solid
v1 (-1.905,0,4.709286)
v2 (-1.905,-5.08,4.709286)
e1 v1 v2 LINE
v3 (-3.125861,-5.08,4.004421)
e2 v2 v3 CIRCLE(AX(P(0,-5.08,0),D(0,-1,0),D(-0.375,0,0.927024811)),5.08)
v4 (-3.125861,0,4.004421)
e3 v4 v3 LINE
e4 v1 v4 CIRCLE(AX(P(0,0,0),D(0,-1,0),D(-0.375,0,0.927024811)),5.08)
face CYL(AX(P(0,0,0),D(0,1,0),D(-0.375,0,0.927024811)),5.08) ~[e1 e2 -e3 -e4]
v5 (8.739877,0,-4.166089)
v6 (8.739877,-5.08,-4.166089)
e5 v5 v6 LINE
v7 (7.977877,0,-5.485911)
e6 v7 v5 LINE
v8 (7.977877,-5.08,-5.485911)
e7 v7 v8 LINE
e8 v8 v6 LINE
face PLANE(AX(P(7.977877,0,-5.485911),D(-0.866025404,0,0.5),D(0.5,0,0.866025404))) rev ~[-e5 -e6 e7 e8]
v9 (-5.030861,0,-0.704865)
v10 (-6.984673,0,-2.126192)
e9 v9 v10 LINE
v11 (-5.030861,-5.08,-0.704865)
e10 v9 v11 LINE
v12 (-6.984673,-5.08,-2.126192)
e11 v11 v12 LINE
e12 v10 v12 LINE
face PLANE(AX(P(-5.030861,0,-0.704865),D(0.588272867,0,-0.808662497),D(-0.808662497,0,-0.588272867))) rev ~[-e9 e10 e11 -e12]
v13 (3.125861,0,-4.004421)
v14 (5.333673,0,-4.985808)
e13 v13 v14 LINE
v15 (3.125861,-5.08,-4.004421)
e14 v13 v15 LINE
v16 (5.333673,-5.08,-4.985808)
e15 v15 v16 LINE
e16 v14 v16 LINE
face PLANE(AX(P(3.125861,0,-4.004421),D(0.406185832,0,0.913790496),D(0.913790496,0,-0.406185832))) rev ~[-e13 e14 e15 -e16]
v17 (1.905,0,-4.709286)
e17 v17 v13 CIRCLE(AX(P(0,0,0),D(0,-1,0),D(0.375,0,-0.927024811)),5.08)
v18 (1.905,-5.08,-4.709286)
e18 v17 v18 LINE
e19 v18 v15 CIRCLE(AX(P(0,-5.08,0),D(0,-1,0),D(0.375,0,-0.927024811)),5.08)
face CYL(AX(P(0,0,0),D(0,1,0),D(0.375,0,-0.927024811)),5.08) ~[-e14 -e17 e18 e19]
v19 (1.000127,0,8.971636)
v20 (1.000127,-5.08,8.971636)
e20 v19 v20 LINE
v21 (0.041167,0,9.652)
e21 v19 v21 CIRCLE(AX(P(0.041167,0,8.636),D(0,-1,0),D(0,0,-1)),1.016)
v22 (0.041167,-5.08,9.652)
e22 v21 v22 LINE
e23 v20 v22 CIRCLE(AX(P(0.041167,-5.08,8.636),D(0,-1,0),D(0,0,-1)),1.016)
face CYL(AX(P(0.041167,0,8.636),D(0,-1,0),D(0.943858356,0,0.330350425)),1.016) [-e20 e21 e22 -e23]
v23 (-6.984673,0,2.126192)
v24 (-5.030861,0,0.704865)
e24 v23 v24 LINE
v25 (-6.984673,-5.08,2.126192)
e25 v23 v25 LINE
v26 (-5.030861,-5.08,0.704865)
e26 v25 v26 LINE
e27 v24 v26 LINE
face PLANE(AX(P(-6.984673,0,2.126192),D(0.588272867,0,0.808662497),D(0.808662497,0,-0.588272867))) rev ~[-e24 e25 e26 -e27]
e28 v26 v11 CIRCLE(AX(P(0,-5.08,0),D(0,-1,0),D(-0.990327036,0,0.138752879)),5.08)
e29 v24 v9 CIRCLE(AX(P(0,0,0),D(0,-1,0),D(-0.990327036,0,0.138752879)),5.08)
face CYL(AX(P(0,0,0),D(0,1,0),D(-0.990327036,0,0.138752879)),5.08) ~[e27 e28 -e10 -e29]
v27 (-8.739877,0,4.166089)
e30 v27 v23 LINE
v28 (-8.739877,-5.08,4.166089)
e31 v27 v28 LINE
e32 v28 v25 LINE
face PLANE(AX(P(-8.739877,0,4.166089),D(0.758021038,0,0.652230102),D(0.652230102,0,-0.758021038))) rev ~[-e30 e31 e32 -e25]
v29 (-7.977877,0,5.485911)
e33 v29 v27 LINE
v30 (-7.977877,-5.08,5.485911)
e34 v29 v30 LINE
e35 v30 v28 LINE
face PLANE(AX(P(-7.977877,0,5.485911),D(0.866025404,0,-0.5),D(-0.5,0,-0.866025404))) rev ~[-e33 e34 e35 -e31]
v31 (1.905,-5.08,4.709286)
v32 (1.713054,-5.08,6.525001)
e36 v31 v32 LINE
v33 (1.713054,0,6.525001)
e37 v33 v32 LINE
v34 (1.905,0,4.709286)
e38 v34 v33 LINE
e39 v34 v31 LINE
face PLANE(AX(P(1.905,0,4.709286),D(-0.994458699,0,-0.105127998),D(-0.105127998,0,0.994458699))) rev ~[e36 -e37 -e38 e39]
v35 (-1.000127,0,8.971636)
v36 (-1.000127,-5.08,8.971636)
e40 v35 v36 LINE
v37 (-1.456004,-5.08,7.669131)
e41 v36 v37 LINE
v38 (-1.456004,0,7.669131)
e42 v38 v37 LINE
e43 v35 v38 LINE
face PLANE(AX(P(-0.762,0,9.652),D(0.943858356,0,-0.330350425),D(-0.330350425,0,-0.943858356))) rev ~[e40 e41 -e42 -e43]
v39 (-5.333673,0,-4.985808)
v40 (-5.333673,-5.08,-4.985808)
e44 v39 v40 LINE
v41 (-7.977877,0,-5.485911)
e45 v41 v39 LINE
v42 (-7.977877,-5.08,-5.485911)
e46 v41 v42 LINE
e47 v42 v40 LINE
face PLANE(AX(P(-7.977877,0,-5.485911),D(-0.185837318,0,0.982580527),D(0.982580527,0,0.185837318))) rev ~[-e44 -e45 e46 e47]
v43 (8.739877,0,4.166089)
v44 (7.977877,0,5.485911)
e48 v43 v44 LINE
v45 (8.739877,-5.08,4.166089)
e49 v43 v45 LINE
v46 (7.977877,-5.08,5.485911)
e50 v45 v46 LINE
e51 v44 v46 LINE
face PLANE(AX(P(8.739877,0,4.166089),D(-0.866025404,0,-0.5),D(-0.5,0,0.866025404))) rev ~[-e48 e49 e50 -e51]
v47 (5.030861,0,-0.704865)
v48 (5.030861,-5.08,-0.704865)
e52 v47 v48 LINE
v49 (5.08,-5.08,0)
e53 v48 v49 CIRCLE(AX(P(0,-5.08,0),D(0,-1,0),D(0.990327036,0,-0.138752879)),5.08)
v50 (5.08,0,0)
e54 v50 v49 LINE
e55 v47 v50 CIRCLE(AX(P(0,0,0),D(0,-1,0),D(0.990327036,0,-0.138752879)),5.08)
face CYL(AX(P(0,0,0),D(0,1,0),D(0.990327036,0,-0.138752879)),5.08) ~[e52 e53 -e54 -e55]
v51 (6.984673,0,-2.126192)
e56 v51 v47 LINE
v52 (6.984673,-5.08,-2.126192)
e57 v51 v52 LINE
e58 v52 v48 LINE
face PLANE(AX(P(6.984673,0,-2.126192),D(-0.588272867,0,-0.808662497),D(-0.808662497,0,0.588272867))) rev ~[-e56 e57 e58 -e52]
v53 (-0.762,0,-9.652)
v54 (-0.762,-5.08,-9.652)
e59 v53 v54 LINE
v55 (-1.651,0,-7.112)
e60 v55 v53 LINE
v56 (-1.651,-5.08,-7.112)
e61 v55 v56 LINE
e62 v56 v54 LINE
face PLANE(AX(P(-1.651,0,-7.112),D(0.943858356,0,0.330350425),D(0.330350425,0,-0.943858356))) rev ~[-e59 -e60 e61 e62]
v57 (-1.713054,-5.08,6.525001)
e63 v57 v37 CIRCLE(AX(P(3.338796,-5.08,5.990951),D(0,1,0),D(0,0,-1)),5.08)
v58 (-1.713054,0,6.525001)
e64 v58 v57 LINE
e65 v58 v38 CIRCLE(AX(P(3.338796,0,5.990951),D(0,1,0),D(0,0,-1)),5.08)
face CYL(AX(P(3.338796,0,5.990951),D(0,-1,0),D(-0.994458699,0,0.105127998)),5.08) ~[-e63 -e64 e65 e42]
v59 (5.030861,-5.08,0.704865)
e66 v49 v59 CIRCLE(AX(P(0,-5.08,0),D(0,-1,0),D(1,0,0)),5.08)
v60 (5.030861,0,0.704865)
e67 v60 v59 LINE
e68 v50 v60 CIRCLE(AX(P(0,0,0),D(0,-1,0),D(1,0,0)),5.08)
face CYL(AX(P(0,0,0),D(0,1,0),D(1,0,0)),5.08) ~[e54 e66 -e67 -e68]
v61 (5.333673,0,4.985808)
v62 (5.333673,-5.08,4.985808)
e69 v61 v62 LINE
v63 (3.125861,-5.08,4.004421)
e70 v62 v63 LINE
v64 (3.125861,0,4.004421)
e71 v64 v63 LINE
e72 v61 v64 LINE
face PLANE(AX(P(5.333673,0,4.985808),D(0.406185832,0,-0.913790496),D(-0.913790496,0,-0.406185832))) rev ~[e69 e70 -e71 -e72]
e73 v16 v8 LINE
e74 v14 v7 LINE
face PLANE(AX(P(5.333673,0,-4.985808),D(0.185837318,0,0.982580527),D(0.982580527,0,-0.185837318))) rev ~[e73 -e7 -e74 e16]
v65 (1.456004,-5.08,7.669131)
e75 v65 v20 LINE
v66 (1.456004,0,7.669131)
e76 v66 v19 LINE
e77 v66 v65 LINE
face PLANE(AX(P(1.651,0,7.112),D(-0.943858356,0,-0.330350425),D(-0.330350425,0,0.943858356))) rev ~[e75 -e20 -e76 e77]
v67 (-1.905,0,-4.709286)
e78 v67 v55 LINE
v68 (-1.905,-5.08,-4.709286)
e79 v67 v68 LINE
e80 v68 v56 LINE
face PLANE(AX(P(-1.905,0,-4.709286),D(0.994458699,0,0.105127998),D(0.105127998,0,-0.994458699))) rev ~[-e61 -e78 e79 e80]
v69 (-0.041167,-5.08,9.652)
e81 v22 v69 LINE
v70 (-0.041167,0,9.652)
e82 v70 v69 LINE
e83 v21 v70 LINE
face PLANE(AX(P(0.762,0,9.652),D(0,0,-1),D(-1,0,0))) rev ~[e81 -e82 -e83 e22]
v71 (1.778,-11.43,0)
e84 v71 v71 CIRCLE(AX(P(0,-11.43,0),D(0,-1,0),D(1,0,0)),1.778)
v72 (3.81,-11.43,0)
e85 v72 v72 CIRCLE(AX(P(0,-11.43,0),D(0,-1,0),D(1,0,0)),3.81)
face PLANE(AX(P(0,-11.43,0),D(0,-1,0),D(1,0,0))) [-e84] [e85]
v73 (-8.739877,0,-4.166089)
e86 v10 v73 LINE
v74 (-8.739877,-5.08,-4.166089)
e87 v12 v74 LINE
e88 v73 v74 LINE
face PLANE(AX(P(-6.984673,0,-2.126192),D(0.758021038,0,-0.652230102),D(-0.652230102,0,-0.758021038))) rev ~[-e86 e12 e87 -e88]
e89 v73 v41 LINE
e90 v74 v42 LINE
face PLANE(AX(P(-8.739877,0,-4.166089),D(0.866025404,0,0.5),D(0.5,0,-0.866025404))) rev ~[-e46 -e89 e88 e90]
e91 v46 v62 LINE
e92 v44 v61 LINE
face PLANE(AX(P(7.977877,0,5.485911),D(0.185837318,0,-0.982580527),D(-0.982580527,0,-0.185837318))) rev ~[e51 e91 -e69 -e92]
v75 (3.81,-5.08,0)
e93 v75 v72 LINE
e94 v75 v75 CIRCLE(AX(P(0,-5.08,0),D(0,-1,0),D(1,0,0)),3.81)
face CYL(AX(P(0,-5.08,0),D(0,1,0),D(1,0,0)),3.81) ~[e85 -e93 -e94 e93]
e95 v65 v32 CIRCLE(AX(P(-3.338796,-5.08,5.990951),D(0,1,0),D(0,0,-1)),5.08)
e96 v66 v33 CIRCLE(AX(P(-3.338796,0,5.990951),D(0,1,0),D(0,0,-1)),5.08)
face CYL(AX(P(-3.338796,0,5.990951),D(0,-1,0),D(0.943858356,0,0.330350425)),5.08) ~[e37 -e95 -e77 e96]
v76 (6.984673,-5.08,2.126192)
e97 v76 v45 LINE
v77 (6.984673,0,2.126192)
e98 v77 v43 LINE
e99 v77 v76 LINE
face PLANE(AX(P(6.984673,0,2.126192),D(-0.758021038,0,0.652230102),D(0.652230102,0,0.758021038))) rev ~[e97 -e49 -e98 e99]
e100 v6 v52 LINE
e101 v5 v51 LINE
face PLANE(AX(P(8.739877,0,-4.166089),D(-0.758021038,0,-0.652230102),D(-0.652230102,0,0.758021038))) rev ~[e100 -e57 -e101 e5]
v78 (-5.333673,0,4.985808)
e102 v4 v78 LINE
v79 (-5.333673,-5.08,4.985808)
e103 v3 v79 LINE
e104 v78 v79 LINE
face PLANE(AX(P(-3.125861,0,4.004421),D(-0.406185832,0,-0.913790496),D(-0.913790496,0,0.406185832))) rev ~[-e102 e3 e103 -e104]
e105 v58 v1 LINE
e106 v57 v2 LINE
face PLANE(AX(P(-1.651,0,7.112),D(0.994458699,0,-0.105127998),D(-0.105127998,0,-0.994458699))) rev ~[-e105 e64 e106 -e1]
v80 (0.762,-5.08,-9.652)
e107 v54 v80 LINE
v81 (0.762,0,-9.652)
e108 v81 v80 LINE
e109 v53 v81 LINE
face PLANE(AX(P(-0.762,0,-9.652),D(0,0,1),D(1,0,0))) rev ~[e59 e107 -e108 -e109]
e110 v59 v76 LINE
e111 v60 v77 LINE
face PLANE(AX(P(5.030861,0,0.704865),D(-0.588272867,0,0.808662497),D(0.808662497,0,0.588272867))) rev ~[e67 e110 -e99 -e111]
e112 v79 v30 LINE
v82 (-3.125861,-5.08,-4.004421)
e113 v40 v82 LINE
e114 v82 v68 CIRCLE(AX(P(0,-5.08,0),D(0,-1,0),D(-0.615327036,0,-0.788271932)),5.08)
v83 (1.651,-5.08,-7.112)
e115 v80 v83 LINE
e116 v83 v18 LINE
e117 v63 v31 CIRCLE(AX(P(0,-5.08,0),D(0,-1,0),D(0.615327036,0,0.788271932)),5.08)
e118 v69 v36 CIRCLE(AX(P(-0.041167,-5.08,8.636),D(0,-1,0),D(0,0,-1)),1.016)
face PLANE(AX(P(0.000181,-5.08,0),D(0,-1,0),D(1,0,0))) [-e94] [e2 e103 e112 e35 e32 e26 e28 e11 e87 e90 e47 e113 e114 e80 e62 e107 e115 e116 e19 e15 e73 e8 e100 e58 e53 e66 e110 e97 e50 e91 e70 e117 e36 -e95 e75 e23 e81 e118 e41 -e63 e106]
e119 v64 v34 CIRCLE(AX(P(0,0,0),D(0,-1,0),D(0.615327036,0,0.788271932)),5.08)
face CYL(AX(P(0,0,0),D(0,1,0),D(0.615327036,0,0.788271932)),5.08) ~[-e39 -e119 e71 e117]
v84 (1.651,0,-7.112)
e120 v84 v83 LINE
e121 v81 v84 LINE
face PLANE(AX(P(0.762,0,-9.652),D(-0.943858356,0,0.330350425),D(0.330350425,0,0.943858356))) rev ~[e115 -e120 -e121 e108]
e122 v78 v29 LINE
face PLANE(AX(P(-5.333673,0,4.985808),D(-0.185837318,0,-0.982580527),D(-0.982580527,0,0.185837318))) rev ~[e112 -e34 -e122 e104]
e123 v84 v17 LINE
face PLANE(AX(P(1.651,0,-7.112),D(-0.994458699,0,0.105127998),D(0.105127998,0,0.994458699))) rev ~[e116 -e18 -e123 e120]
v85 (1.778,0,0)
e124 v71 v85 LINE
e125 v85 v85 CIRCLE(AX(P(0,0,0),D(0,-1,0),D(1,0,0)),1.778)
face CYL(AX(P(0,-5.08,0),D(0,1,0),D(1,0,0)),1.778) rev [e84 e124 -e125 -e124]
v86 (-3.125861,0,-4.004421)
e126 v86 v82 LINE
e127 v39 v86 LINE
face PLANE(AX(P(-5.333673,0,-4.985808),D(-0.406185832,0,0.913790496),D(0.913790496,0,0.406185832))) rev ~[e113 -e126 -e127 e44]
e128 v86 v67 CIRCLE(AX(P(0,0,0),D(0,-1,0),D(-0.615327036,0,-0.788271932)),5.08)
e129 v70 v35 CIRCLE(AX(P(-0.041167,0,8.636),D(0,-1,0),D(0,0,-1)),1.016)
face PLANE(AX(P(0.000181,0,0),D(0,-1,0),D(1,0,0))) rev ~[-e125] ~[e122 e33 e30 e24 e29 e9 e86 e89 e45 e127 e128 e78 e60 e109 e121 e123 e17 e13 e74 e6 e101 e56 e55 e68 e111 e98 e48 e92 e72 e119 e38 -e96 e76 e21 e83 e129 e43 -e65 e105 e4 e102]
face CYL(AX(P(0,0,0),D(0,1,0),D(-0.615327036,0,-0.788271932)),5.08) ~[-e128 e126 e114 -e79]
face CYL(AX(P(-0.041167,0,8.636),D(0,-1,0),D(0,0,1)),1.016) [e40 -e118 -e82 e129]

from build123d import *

# Parameters (mm, degrees)
F0_R     = 1.778
F1_DEPTH = 5.08
F2_R     = 3.81
F2_R_2   = 1.778
F3_DEPTH = 6.35
F4_R     = 5.08
F5_R     = 1.016


# Not quite as in the source:
# - a feature names something its author has since deleted; it is built from what else it names


with BuildPart() as f1:
    # F0 (on Front) → F1 (new body)
    with BuildSketch(Plane.XZ):
        with BuildLine():
            ThreePointArc((5.0308613437, -0.7048646254), (5.0677004463, -0.353287683), (5.08, 0))
            ThreePointArc((5.08, 0), (5.0677004463, 0.353287683), (5.0308613437, 0.7048646254))
            ThreePointArc((5.0308613437, 0.7048646254), (4.3994090512, 2.54), (3.1258613437, 4.0044214139))
            ThreePointArc((3.1258613437, 4.0044214139), (2.54, 4.3994090512), (1.905, 4.7092860393))
            ThreePointArc((1.905, 4.7092860393), (0, 5.08), (-1.905, 4.7092860393))
            ThreePointArc((-1.905, 4.7092860393), (-2.54, 4.3994090512), (-3.1258613437, 4.0044214139))
            ThreePointArc((-3.1258613437, 4.0044214139), (-4.3994090512, 2.54), (-5.0308613437, 0.7048646254))
            ThreePointArc((-5.0308613437, 0.7048646254), (-5.08, 0), (-5.0308613437, -0.7048646254))
            ThreePointArc((-5.0308613437, -0.7048646254), (-4.3994090512, -2.54), (-3.1258613437, -4.0044214139))
            ThreePointArc((-3.1258613437, -4.0044214139), (-2.54, -4.3994090512), (-1.905, -4.7092860393))
            ThreePointArc((-1.905, -4.7092860393), (0, -5.08), (1.905, -4.7092860393))
            ThreePointArc((1.905, -4.7092860393), (2.54, -4.3994090512), (3.1258613437, -4.0044214139))
            ThreePointArc((3.1258613437, -4.0044214139), (4.3994090512, -2.54), (5.0308613437, -0.7048646254))
        make_face()
        Circle(F0_R, mode=Mode.SUBTRACT)
        with BuildLine():
            ThreePointArc((3.1258613437, 4.0044214139), (4.3994090512, 2.54), (5.0308613437, 0.7048646254))
            Line((5.0308613437, 0.7048646254), (6.9846726717, 2.1261920584))
            Line((6.9846726717, 2.1261920584), (8.7398771973, 4.1660886423))
            Line((8.7398771973, 4.1660886423), (7.9778771973, 5.4859113577))
            Line((7.9778771973, 5.4859113577), (5.3336726717, 4.9858079416))
            Line((5.3336726717, 4.9858079416), (3.1258613437, 4.0044214139))
        make_face()
        with BuildLine():
            Line((6.9846726717, -2.1261920584), (5.0308613437, -0.7048646254))
            ThreePointArc((5.0308613437, -0.7048646254), (4.3994090512, -2.54), (3.1258613437, -4.0044214139))
            Line((3.1258613437, -4.0044214139), (5.3336726717, -4.9858079416))
            Line((5.3336726717, -4.9858079416), (7.9778771973, -5.4859113577))
            Line((7.9778771973, -5.4859113577), (8.7398771973, -4.1660886423))
            Line((8.7398771973, -4.1660886423), (6.9846726717, -2.1261920584))
        make_face()
        with BuildLine():
            ThreePointArc((-1.905, 4.7092860393), (0, 5.08), (1.905, 4.7092860393))
            Line((1.905, 4.7092860393), (1.651, 7.112))
            Line((1.651, 7.112), (0.762, 9.652))
            Line((0.762, 9.652), (-0.762, 9.652))
            Line((-0.762, 9.652), (-1.651, 7.112))
            Line((-1.651, 7.112), (-1.905, 4.7092860393))
        make_face()
        with BuildLine():
            Line((1.651, -7.112), (1.905, -4.7092860393))
            ThreePointArc((1.905, -4.7092860393), (0, -5.08), (-1.905, -4.7092860393))
            Line((-1.905, -4.7092860393), (-1.651, -7.112))
            Line((-1.651, -7.112), (-0.762, -9.652))
            Line((-0.762, -9.652), (0.762, -9.652))
            Line((0.762, -9.652), (1.651, -7.112))
        make_face()
        with BuildLine():
            ThreePointArc((-5.0308613437, 0.7048646254), (-4.3994090512, 2.54), (-3.1258613437, 4.0044214139))
            Line((-3.1258613437, 4.0044214139), (-5.3336726717, 4.9858079416))
            Line((-5.3336726717, 4.9858079416), (-7.9778771973, 5.4859113577))
            Line((-7.9778771973, 5.4859113577), (-8.7398771973, 4.1660886423))
            Line((-8.7398771973, 4.1660886423), (-6.9846726717, 2.1261920584))
            Line((-6.9846726717, 2.1261920584), (-5.0308613437, 0.7048646254))
        make_face()
        with BuildLine():
            Line((-5.3336726717, -4.9858079416), (-3.1258613437, -4.0044214139))
            ThreePointArc((-3.1258613437, -4.0044214139), (-4.3994090512, -2.54), (-5.0308613437, -0.7048646254))
            Line((-5.0308613437, -0.7048646254), (-6.9846726717, -2.1261920584))
            Line((-6.9846726717, -2.1261920584), (-8.7398771973, -4.1660886423))
            Line((-8.7398771973, -4.1660886423), (-7.9778771973, -5.4859113577))
            Line((-7.9778771973, -5.4859113577), (-5.3336726717, -4.9858079416))
        make_face()
    extrude(amount=F1_DEPTH)

    # F2 (on face) → F3 (join)
    with BuildSketch(Plane.XZ.offset(5.08)):
        Circle(F2_R)
        Circle(F2_R_2, mode=Mode.SUBTRACT)
    extrude(amount=F3_DEPTH)

    # F4
    f4_edges = [f1.edges().sort_by_distance(p)[0] for p in [
        (1.651, -2.54, 7.112),
        (-1.651, -2.54, 7.112),
    ]]
    fillet(f4_edges, radius=F4_R)

    # F5
    f5_edges = [f1.edges().sort_by_distance(p)[0] for p in [
        (0.762, -2.54, 9.652),
        (-0.762, -2.54, 9.652),
    ]]
    fillet(f5_edges, radius=F5_R)


solid = f1.part
